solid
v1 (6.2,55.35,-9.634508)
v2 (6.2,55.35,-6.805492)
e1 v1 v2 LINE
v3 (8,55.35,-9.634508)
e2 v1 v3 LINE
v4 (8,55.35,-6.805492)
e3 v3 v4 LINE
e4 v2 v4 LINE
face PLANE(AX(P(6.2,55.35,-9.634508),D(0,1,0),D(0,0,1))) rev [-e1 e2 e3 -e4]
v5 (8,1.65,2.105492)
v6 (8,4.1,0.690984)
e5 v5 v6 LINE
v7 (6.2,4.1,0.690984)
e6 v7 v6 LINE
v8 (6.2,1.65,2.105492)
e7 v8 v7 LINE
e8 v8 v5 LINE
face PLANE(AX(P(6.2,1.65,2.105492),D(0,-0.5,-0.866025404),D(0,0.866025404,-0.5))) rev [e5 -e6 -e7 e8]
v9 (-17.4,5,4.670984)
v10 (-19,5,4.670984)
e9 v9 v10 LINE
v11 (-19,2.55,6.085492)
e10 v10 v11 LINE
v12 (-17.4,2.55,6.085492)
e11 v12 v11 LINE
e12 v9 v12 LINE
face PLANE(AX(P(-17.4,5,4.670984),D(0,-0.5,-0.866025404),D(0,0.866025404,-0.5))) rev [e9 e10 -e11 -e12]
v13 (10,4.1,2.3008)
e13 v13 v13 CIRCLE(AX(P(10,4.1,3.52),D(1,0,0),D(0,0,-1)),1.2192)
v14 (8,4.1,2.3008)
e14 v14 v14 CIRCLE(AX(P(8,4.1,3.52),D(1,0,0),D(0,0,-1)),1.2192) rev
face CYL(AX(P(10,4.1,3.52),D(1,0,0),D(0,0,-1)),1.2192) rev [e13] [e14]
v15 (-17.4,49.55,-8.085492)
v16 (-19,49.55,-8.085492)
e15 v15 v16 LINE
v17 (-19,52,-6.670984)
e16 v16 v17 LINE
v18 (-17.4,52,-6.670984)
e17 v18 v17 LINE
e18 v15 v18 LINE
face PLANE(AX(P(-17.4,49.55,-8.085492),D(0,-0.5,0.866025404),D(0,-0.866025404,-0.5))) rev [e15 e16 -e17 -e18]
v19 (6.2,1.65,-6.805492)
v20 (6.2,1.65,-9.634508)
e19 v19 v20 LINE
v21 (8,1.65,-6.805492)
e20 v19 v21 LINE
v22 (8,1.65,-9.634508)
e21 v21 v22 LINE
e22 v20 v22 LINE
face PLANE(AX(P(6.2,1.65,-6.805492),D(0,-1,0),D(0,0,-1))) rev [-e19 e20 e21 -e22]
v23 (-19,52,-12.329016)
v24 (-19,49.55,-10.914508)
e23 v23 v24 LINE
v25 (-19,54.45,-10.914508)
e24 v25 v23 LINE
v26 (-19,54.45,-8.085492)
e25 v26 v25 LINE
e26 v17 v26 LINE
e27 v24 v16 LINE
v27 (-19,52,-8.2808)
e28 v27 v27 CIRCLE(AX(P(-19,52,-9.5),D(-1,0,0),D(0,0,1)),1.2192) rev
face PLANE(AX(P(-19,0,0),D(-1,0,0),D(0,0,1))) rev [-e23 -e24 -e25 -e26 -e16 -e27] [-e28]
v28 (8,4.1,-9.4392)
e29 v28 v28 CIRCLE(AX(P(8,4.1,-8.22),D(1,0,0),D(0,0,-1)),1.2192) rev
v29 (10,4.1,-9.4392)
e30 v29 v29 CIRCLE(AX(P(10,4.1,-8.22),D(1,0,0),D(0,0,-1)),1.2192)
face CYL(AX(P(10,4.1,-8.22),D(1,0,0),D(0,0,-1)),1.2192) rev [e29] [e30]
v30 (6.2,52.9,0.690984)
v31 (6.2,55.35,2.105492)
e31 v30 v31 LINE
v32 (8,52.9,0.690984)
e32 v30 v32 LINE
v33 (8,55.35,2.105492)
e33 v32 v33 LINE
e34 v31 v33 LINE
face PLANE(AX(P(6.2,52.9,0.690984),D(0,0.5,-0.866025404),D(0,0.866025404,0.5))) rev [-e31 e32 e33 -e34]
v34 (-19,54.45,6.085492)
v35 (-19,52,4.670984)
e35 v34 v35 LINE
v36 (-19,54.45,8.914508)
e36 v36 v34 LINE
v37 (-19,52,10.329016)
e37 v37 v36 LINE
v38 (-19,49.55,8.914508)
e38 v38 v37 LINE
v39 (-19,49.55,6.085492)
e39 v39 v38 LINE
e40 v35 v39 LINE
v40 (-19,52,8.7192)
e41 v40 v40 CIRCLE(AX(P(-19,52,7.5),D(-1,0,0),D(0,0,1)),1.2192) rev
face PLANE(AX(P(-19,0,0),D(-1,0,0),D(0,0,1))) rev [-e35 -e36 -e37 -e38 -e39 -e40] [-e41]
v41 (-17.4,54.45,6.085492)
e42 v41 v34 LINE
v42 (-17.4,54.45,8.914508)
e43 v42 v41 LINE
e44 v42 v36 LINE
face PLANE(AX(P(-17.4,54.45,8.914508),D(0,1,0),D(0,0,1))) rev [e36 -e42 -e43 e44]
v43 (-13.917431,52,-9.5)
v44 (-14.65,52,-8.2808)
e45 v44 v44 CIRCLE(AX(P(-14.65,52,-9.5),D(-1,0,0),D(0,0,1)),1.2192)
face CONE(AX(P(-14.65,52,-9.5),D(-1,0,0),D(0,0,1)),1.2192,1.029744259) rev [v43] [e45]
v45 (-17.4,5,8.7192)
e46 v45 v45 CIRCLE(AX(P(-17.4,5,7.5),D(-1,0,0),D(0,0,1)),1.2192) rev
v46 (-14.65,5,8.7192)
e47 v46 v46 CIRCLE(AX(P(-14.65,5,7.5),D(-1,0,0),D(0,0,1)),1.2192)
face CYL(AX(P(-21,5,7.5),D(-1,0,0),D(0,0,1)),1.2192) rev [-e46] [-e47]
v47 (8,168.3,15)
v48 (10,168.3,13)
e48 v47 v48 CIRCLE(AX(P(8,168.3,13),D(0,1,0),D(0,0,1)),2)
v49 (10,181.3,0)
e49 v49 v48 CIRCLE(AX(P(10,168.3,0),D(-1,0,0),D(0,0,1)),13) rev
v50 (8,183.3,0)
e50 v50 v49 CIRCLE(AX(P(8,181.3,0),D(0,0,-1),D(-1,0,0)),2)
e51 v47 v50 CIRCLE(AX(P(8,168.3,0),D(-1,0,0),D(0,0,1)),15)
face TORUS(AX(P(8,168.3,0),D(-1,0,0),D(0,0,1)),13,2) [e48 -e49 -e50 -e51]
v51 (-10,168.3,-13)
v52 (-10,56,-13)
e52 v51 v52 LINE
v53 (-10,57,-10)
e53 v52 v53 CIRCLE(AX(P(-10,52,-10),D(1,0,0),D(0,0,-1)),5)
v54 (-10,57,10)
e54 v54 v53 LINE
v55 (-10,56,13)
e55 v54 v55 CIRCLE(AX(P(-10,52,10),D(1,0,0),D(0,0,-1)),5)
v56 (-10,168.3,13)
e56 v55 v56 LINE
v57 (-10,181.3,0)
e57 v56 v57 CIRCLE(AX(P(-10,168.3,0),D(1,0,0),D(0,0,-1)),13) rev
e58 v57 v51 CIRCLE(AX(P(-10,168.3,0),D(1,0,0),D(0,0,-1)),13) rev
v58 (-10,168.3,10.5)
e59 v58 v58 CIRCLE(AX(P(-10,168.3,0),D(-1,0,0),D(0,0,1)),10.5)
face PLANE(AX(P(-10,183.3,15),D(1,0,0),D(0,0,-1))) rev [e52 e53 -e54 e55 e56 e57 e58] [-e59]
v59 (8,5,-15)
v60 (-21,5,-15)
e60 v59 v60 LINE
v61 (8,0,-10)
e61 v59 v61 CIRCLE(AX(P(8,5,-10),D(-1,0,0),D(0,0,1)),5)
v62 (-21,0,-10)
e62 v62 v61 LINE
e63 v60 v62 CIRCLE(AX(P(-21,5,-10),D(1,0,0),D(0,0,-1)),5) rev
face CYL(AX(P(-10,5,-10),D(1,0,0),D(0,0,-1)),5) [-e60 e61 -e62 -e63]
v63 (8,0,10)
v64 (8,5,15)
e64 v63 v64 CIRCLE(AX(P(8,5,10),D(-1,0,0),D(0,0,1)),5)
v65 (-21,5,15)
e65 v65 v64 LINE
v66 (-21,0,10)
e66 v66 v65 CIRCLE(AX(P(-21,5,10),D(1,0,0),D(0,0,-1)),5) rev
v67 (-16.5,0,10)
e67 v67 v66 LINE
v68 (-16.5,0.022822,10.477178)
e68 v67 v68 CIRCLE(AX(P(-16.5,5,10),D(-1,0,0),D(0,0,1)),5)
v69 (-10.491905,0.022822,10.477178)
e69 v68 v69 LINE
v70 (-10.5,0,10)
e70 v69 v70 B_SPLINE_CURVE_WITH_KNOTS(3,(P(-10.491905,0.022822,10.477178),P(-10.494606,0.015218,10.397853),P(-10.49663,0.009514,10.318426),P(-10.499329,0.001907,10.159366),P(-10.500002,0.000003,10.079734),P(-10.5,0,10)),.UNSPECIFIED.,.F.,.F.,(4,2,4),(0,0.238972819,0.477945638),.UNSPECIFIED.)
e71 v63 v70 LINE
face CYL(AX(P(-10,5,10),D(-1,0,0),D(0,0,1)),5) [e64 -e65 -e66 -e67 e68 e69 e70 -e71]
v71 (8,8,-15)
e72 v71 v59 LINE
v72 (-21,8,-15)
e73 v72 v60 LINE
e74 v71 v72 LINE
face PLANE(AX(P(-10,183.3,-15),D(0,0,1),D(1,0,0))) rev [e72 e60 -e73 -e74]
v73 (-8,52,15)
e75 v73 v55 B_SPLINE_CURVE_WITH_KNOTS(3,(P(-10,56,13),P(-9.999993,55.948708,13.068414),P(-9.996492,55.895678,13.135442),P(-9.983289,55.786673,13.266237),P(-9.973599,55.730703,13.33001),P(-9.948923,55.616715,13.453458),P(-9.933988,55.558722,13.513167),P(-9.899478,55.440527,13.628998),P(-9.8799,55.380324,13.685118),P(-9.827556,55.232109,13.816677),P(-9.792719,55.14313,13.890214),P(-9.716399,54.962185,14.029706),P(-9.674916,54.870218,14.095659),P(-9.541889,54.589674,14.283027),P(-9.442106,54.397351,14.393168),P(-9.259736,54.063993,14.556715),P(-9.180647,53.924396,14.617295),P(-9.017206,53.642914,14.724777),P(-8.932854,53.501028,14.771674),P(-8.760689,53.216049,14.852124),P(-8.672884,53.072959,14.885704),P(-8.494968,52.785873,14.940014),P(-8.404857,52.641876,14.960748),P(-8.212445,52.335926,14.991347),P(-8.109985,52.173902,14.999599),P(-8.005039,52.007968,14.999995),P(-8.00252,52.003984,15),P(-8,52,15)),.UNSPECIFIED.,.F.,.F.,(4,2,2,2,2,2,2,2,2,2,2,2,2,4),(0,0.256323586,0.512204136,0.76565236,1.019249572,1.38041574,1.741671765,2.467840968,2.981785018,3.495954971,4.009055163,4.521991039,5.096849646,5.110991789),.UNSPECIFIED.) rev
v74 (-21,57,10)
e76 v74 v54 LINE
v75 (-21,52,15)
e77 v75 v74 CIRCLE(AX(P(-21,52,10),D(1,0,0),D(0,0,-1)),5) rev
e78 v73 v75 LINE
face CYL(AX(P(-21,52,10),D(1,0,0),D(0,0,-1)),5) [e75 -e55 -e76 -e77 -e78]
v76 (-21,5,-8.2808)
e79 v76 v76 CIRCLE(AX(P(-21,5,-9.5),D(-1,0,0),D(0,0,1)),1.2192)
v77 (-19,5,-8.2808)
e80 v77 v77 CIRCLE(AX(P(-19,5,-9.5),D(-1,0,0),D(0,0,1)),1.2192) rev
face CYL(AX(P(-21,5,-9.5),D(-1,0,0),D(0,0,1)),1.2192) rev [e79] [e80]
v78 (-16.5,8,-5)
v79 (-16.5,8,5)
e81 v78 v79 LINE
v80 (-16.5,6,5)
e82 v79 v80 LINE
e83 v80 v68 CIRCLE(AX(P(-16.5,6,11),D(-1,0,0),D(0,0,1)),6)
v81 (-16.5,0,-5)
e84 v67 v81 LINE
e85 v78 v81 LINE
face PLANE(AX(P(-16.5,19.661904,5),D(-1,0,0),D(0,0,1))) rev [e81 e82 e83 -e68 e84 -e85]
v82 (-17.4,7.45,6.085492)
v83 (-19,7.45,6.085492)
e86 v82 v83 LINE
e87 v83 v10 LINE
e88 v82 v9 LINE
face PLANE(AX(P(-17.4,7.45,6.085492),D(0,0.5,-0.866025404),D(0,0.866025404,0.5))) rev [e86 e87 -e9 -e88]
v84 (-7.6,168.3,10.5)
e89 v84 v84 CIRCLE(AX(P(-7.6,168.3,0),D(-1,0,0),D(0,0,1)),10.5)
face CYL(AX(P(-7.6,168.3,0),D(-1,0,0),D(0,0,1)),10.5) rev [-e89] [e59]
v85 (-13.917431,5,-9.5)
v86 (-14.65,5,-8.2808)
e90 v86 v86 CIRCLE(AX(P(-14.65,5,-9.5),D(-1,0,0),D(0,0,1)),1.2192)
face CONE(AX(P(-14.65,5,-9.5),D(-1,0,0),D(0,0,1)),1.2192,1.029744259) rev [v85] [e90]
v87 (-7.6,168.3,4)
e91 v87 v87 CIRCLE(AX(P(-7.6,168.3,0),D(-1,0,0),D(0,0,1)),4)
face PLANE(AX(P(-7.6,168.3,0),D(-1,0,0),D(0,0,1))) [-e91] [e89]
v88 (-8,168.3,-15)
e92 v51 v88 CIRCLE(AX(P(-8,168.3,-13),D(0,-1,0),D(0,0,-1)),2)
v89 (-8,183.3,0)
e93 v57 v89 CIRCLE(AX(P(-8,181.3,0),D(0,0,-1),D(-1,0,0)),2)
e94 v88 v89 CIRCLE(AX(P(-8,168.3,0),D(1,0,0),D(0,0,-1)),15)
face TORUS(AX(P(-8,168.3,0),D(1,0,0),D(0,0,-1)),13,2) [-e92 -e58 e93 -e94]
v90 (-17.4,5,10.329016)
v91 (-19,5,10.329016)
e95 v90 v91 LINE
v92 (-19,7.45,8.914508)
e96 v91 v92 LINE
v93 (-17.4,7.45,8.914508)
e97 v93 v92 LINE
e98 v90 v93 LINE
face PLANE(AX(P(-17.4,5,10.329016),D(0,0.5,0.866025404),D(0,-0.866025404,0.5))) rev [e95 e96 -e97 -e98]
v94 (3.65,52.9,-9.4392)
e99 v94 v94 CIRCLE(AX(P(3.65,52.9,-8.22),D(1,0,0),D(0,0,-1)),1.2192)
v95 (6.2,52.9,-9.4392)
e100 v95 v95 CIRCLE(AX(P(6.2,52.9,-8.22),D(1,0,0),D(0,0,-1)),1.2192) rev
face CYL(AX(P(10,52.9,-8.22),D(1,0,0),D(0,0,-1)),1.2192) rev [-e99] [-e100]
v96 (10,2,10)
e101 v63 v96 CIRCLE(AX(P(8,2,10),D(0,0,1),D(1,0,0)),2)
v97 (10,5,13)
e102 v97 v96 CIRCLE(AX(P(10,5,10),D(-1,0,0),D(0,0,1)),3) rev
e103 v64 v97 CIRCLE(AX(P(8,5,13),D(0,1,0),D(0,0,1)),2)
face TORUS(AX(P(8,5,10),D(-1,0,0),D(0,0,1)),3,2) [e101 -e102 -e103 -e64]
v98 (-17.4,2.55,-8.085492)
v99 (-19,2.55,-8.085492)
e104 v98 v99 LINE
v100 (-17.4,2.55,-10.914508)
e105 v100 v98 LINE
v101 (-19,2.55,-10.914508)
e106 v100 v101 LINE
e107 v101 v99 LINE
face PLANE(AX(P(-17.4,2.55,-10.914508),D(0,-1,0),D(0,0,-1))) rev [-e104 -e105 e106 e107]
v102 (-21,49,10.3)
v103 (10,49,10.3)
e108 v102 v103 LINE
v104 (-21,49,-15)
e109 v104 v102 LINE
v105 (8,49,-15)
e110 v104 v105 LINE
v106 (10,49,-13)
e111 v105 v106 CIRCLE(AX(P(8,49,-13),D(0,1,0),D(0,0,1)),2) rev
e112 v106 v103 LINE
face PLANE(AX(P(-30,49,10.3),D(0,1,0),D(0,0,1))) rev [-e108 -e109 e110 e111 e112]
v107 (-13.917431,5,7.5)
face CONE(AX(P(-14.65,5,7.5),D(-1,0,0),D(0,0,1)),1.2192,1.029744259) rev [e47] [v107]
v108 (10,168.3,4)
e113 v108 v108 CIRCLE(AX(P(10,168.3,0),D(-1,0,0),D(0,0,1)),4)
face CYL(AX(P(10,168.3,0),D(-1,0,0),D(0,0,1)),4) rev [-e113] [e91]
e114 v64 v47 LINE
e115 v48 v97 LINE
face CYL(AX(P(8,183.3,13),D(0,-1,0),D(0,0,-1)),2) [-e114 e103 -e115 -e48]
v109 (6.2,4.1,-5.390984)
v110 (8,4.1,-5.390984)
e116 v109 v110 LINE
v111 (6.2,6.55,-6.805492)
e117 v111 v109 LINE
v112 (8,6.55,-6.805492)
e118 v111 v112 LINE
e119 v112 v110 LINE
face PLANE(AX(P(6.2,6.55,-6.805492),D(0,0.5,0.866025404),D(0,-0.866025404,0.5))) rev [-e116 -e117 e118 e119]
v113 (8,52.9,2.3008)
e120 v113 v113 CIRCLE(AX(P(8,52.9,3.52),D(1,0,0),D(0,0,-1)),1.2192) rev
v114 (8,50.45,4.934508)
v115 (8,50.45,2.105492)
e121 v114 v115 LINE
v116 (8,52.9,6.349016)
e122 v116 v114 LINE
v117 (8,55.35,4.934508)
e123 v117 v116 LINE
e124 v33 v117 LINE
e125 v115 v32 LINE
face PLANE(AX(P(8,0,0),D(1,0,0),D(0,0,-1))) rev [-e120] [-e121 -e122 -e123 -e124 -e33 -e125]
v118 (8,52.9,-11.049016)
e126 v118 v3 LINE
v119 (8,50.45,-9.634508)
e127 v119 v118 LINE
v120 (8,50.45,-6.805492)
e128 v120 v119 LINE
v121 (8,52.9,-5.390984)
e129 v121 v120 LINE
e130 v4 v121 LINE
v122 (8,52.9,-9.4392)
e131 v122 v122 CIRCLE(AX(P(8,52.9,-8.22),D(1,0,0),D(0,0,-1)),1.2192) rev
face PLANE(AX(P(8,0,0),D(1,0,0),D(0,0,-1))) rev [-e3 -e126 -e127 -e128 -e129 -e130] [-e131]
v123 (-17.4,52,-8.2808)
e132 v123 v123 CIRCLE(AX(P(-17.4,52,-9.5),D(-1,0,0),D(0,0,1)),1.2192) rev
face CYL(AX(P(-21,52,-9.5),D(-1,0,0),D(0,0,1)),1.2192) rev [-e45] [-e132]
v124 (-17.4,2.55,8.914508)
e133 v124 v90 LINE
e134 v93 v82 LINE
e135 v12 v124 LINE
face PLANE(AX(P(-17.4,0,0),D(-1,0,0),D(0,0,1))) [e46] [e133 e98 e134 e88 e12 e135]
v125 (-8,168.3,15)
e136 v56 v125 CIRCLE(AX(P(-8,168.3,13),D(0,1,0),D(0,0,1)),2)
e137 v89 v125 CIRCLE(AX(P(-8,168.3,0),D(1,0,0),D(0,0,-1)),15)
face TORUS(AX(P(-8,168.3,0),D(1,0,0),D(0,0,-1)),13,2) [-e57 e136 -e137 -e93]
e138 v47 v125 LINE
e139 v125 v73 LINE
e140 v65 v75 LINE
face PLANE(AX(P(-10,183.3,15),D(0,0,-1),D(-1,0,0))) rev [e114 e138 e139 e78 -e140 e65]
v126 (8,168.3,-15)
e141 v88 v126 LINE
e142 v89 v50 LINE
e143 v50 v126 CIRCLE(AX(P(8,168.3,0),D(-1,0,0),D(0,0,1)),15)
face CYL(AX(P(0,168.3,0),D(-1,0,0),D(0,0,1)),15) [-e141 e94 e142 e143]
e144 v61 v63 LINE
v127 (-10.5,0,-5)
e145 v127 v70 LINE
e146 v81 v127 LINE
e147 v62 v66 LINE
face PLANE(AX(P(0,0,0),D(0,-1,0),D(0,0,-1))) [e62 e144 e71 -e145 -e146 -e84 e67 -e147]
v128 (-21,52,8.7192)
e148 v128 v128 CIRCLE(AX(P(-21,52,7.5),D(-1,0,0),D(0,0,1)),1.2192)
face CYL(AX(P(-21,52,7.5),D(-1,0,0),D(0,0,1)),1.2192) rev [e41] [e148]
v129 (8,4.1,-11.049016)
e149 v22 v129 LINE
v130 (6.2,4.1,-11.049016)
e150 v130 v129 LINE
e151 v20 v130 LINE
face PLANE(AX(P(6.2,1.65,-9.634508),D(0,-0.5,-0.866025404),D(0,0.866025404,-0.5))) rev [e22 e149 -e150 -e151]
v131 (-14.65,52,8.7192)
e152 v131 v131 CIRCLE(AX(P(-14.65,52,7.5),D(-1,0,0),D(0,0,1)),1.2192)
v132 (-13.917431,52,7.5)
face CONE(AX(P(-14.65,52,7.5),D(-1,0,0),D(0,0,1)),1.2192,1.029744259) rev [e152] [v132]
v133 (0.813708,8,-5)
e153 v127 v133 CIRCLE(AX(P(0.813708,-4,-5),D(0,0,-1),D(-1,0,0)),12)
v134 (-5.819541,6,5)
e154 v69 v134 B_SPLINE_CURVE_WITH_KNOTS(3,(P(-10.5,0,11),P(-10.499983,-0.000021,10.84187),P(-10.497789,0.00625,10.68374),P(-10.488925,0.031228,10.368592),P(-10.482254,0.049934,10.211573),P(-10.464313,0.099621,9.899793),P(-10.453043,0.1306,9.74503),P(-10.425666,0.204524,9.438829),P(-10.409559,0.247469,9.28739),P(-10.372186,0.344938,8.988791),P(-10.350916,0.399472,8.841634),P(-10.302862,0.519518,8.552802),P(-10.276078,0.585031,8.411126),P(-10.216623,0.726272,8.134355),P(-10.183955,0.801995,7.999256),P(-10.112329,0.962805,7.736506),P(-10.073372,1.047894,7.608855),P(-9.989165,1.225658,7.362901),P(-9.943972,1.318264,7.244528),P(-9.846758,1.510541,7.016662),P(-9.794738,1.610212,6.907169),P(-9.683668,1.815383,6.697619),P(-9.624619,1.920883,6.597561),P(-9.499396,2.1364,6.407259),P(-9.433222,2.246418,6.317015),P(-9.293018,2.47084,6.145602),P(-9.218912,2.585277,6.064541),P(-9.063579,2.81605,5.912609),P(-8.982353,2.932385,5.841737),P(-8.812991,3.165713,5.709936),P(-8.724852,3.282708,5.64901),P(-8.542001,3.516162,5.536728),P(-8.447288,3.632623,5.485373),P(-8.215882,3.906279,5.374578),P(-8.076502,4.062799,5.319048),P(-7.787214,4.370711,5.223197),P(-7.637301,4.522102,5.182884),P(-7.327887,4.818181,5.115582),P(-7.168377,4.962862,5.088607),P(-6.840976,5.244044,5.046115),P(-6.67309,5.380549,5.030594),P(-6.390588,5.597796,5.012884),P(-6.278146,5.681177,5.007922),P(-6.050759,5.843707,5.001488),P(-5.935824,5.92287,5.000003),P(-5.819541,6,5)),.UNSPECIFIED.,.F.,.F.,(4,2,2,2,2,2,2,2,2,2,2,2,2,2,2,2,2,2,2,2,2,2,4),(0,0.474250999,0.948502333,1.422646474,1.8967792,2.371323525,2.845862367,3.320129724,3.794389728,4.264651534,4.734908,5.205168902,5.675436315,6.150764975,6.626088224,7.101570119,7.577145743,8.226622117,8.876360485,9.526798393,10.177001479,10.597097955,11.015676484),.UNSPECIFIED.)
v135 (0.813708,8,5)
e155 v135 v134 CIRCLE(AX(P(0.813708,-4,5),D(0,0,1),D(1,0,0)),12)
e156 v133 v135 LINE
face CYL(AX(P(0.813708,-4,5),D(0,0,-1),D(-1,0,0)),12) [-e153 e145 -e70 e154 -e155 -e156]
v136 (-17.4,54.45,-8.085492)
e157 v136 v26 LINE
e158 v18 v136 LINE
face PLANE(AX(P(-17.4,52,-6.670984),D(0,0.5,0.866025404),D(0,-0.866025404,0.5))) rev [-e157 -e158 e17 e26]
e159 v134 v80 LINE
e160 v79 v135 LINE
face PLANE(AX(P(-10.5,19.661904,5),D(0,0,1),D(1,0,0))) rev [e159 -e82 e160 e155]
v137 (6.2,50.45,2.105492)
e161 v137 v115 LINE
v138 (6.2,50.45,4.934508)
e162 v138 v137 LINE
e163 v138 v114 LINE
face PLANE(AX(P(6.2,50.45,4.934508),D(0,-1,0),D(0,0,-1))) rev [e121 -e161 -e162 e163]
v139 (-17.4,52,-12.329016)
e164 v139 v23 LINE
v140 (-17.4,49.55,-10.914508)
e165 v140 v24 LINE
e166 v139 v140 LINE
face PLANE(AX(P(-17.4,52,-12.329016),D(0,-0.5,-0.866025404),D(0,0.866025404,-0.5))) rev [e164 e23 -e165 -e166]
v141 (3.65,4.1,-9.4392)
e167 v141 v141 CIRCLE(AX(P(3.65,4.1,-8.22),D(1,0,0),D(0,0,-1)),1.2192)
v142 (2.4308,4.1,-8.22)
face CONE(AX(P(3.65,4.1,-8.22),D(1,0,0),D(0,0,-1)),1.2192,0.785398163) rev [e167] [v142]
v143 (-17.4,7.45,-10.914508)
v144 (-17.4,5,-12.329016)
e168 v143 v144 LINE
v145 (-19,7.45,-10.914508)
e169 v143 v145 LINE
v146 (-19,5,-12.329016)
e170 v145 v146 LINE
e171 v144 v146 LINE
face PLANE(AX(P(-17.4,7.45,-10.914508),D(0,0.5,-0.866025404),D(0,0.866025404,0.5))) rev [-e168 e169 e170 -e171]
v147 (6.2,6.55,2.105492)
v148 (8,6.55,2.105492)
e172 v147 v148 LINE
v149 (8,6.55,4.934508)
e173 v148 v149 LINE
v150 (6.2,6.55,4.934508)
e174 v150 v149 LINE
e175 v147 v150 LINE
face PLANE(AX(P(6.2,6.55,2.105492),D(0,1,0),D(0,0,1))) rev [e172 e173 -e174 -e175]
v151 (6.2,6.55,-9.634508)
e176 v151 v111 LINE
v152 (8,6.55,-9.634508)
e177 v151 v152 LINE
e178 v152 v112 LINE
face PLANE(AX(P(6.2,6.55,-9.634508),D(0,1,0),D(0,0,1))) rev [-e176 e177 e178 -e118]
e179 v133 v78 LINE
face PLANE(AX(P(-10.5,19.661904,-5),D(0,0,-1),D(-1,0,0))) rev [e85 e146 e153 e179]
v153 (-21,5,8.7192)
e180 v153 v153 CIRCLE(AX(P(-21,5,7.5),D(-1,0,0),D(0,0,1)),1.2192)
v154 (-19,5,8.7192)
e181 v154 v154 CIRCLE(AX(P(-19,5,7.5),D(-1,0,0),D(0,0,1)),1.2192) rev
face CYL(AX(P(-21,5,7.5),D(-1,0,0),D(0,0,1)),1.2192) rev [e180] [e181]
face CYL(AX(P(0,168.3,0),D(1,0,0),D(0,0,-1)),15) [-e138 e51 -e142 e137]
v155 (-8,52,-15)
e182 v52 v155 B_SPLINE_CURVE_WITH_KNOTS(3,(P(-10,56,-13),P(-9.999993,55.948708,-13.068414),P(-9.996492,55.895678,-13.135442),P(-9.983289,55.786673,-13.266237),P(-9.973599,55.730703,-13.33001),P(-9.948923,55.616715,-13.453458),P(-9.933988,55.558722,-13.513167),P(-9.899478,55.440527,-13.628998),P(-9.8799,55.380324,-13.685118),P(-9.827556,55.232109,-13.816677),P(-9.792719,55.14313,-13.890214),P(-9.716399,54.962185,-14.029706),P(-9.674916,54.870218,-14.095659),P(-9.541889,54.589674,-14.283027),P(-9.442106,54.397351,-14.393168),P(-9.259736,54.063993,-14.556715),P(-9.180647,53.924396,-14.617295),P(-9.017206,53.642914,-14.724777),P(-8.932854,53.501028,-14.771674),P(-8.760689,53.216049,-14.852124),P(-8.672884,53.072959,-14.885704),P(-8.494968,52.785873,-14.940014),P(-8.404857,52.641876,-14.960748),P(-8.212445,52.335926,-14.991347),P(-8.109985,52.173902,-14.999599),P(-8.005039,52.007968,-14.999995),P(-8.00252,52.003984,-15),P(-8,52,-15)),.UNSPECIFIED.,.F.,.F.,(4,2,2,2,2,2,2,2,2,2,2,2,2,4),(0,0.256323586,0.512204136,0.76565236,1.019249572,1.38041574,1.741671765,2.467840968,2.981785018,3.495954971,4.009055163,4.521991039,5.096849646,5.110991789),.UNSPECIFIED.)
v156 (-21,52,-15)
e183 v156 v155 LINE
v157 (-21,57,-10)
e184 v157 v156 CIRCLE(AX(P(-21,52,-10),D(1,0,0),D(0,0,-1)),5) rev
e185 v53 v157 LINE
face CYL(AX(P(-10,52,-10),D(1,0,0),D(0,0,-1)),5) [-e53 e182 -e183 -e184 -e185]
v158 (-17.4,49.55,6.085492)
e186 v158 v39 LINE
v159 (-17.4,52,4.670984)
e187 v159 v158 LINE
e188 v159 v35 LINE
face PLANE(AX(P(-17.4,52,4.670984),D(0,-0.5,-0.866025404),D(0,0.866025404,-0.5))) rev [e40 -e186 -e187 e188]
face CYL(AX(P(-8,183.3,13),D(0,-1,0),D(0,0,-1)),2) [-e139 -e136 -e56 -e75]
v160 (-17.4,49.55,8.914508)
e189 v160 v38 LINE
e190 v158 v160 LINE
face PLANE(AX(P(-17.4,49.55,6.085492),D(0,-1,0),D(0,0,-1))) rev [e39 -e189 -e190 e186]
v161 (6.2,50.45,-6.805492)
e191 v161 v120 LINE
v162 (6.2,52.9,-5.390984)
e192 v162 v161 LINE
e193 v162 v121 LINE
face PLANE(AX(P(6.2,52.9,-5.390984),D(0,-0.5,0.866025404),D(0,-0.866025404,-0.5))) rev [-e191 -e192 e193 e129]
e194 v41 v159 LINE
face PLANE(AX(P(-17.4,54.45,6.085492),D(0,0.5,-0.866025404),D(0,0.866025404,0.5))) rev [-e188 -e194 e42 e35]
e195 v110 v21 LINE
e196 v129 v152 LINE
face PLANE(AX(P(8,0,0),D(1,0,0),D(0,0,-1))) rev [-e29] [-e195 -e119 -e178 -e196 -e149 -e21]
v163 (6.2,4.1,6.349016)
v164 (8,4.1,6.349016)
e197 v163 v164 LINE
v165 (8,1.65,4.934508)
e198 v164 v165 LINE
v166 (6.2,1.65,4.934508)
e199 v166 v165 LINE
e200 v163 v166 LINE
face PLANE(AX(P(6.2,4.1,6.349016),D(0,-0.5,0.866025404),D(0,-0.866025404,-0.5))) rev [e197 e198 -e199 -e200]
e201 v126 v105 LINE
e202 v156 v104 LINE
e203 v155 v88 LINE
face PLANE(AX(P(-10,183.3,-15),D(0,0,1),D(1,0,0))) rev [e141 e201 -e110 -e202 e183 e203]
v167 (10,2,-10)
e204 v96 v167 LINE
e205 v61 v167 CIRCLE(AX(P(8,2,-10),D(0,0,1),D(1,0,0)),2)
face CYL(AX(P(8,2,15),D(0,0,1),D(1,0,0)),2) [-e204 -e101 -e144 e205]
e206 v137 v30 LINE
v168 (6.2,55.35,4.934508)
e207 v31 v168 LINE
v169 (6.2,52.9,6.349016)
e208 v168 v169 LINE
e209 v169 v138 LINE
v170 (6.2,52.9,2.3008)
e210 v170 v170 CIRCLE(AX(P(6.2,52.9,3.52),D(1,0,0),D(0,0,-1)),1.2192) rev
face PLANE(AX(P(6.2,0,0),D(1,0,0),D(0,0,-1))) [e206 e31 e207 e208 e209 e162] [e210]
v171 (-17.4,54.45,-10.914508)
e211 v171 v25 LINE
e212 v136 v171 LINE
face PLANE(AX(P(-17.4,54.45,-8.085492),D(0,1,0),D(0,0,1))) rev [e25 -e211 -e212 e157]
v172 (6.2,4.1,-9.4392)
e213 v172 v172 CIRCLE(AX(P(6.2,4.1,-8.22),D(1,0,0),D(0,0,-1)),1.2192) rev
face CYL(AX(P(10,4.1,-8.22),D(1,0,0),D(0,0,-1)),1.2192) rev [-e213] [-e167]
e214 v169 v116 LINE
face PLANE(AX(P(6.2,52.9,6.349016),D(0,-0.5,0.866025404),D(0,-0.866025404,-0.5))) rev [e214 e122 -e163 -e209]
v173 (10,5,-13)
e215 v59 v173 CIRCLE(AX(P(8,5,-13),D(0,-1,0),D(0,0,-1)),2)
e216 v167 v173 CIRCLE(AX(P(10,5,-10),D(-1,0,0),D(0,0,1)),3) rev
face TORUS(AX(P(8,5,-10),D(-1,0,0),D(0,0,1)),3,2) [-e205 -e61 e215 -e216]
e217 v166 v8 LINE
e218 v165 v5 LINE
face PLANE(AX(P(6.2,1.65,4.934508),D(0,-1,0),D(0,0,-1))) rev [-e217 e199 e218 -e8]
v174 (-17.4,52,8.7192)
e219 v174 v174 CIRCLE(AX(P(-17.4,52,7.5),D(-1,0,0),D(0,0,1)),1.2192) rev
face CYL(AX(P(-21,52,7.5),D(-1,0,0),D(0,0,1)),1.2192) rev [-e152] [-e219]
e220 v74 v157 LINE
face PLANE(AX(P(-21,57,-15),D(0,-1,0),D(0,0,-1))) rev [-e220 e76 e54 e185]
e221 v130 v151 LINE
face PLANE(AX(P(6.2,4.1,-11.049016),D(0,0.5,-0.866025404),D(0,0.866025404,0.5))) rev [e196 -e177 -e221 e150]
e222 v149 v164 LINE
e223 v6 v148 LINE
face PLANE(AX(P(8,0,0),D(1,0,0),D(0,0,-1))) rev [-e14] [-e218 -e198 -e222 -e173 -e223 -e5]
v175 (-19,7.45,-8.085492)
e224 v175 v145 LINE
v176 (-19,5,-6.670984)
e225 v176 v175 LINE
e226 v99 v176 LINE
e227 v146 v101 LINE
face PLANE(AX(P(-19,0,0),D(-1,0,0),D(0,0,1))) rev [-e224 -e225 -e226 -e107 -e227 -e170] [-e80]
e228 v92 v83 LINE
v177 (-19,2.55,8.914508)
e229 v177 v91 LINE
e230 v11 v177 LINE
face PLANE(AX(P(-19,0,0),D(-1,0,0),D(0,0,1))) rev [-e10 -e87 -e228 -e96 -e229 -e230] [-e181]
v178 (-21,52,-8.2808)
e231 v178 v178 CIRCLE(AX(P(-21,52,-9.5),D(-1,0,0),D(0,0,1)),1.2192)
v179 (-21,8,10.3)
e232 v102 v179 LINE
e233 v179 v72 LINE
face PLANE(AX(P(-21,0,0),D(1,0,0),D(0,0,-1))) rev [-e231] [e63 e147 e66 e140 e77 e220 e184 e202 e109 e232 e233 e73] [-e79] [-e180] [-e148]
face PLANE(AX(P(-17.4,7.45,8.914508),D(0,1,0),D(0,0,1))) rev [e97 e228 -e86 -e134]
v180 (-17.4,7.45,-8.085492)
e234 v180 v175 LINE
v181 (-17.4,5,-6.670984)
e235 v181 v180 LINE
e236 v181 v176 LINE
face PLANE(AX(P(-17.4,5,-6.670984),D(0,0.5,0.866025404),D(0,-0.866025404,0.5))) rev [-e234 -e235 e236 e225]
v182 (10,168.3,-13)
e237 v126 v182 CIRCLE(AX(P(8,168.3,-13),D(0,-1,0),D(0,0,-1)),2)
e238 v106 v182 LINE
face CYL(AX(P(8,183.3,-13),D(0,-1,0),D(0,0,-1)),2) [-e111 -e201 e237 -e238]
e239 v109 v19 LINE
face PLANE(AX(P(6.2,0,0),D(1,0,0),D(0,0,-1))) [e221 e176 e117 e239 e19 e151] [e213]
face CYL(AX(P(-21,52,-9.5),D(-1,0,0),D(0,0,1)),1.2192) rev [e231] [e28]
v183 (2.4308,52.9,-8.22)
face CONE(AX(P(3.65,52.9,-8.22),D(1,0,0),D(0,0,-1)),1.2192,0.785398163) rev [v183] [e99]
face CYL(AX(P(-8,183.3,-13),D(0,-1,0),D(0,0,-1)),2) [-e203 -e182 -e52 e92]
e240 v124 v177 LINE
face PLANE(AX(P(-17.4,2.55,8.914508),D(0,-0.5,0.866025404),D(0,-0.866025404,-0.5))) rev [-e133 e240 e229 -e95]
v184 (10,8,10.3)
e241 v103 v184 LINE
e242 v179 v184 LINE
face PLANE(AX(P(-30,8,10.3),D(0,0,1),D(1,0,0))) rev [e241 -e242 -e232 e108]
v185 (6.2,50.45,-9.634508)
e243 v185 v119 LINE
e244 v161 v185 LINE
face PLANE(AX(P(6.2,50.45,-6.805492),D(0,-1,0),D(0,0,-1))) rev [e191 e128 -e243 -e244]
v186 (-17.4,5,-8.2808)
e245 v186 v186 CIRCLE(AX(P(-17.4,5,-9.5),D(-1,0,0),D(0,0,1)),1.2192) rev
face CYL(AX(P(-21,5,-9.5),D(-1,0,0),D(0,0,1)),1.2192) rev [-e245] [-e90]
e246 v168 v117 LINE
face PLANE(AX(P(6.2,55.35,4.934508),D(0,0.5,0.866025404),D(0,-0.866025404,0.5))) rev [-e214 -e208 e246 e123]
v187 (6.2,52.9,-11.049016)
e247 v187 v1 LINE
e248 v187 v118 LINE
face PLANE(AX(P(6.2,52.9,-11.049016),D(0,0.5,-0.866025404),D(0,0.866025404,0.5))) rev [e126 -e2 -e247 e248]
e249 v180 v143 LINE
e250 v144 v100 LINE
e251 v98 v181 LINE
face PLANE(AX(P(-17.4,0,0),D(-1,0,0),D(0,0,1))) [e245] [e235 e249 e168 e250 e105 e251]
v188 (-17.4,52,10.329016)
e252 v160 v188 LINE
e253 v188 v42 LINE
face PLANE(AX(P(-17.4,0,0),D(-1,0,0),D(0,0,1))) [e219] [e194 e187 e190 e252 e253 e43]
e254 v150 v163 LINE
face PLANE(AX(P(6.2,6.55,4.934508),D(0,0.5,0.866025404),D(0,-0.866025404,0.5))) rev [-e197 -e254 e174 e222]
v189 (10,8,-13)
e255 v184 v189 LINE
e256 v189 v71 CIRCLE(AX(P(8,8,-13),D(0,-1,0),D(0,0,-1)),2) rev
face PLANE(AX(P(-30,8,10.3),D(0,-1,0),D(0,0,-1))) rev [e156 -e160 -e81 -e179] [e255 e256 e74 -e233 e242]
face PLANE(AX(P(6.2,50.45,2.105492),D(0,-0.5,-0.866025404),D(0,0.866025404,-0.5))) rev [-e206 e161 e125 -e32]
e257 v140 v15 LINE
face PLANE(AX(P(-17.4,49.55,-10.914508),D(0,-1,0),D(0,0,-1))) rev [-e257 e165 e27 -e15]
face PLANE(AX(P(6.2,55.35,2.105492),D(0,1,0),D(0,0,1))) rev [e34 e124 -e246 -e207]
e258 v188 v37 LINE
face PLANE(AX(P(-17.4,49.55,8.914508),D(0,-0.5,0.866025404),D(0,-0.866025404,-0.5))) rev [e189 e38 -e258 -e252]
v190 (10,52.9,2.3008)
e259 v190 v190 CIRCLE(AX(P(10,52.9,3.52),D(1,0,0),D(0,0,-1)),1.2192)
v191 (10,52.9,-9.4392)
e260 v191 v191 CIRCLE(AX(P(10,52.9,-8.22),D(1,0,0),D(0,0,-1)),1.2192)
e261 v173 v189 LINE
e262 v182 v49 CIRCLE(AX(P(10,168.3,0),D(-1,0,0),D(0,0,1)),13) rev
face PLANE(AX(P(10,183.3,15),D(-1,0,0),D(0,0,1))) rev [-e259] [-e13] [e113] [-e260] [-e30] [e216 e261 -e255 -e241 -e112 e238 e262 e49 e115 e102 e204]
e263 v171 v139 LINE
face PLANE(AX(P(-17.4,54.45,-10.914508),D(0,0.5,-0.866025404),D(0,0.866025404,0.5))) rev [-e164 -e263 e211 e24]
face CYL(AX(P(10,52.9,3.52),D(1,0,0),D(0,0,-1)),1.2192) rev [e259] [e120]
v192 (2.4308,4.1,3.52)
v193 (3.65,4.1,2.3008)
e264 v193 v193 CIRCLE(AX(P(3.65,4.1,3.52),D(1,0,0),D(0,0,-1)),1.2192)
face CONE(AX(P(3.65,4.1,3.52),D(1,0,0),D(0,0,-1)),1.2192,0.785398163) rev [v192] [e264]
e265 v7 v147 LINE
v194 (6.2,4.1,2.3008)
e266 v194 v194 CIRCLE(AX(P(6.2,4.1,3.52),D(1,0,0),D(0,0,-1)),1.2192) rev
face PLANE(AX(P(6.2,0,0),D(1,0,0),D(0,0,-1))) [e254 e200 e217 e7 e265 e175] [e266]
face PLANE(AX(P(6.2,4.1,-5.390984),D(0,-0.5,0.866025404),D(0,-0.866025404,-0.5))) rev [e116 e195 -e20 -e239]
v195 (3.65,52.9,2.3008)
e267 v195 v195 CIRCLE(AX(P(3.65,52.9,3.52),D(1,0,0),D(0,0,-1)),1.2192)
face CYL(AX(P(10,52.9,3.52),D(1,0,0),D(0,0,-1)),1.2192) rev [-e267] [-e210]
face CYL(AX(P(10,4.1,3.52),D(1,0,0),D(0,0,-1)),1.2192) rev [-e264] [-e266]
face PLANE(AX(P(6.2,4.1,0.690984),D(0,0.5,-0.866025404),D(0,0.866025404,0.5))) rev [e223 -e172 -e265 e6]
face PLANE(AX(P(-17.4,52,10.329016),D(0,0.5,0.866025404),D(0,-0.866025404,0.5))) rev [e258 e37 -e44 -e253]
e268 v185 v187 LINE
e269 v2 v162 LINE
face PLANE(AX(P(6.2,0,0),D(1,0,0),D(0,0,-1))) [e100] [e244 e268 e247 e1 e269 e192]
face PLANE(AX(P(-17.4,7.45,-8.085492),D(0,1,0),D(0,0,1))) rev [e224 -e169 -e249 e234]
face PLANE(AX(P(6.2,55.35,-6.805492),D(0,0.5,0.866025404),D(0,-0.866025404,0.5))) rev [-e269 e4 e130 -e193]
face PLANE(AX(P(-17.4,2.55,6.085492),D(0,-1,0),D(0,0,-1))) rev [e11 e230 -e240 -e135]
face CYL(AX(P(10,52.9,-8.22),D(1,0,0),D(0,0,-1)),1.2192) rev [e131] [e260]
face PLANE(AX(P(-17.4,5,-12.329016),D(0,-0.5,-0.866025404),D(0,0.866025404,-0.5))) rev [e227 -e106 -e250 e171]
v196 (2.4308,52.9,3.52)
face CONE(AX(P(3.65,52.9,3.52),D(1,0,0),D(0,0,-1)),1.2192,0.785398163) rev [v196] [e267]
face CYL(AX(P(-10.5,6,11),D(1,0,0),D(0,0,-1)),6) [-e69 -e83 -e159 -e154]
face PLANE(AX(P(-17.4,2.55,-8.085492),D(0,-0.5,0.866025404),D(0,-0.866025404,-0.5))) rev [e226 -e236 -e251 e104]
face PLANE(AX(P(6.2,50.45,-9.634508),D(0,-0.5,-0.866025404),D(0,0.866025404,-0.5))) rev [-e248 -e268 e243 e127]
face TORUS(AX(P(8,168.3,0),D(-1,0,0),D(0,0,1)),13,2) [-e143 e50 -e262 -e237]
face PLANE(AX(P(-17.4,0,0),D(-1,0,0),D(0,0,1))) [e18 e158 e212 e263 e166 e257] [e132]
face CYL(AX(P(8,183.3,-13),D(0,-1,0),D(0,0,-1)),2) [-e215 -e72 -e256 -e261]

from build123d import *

# Parameters (mm, degrees)
SKETCH1_W                 = 20
SKETCH1_H                 = 30
BOSS_EXTRUDE1_DEPTH       = 183.3
SKETCH13_W                = 30
SKETCH13_H                = 57
BOSS_EXTRUDE2_DEPTH       = 11
SKETCH3_W                 = 20.6
SKETCH3_H                 = 41
CUT_EXTRUDE1_DEPTH        = 40
SKETCH11_R                = 10.5
CUT_EXTRUDE4_DEPTH        = 2.4
SKETCH12_R                = 4
CUT_EXTRUDE5_DEPTH        = 185.752943143
SKETCH14_W                = 31
SKETCH14_H                = 41
CUT_EXTRUDE6_DEPTH        = 25.3
F_2_CLEARANCE_HOLE2_D     = 2.4384
F_2_CLEARANCE_HOLE2_DEPTH = 6.35
F_2_CLEARANCE_HOLE2_TIP   = 0.732569267
CUT_EXTRUDE8_START        = -2
CUT_EXTRUDE8_DEPTH        = 1.6
F_2_CLEARANCE_HOLE3_D     = 2.4384
F_2_CLEARANCE_HOLE3_DEPTH = 6.35
F_2_CLEARANCE_HOLE3_TIP   = 1.2192
FILLET3_R                 = 15
FILLET4_R                 = 5
FILLET5_R                 = 2
SKETCH21_W                = 6
SKETCH21_H                = 10
CUT_EXTRUDE9_DEPTH        = 8
FILLET6_R                 = 12
FILLET7_R                 = 6
CUT_EXTRUDE10_START       = -2
CUT_EXTRUDE10_DEPTH       = 1.8


# Some blends are built 0.0001 mm under size
with BuildPart() as part:
    # Sketch1 → Boss-Extrude1 (new body)
    with BuildSketch(Plane(origin=(0, 0, 0), x_dir=(1, 0, 0), z_dir=(0, 1, 0))):
        Rectangle(SKETCH1_W, SKETCH1_H)
    extrude(amount=BOSS_EXTRUDE1_DEPTH)

    # Sketch13 → Boss-Extrude2 (add)
    with BuildSketch(Plane.ZY.offset(10)):
        with Locations((0, 28.5)):
            Rectangle(SKETCH13_W, SKETCH13_H)
    extrude(amount=BOSS_EXTRUDE2_DEPTH)

    # Sketch3 → Cut-Extrude1 (cut)
    with BuildSketch(Plane(origin=(10, 0, 0), x_dir=(0, 0, -1), z_dir=(1, 0, 0))):
        with Locations((0, 28.5)):
            Rectangle(SKETCH3_W, SKETCH3_H)
    extrude(amount=-CUT_EXTRUDE1_DEPTH, mode=Mode.SUBTRACT)

    # Sketch11 → Cut-Extrude4 (cut)
    with BuildSketch(Plane.ZY.offset(10)):
        with Locations((0, 168.3)):
            Circle(SKETCH11_R)
    extrude(amount=-CUT_EXTRUDE4_DEPTH, mode=Mode.SUBTRACT)

    # Sketch12 → Cut-Extrude5 (cut, through all)
    with BuildSketch(Plane.ZY.offset(7.6)):
        with Locations((0, 168.3)):
            Circle(SKETCH12_R)
    extrude(amount=-CUT_EXTRUDE5_DEPTH, mode=Mode.SUBTRACT)

    # Sketch14 → Cut-Extrude6 (cut)
    with BuildSketch(Plane(origin=(0, 0, -15), x_dir=(-1, 0, 0), z_dir=(0, 0, -1))):
        with Locations((5.5, 28.5)):
            Rectangle(SKETCH14_W, SKETCH14_H)
    extrude(amount=-CUT_EXTRUDE6_DEPTH, mode=Mode.SUBTRACT)

    # #2 Clearance Hole2
    with Locations(Plane.ZY.offset(21)):
        with Locations((-9.5, 5), (7.5, 5), (-9.5, 52), (7.5, 52)):
            Hole(F_2_CLEARANCE_HOLE2_D / 2, depth=F_2_CLEARANCE_HOLE2_DEPTH)
            with Locations((0, 0, -(F_2_CLEARANCE_HOLE2_DEPTH + F_2_CLEARANCE_HOLE2_TIP / 2))):  # 118° drill point
                Cone(0, F_2_CLEARANCE_HOLE2_D / 2, F_2_CLEARANCE_HOLE2_TIP, mode=Mode.SUBTRACT)

    # Sketch18 → Cut-Extrude8 (cut)
    with BuildSketch(Plane.ZY.offset(21).offset(CUT_EXTRUDE8_START)):
        Polygon((-12.329016319, 5), (-10.91450816, 2.55), (-8.08549184, 2.55), (-6.670983681, 5), (-8.08549184, 7.45), (-10.91450816, 7.45), align=None)
        Polygon((10.329016319, 5), (8.91450816, 7.45), (6.08549184, 7.45), (4.670983681, 5), (6.08549184, 2.55), (8.91450816, 2.55), align=None)
        Polygon((4.670983681, 52), (6.08549184, 49.55), (8.91450816, 49.55), (10.329016319, 52), (8.91450816, 54.45), (6.08549184, 54.45), align=None)
        Polygon((-6.670983681, 52), (-8.08549184, 54.45), (-10.91450816, 54.45), (-12.329016319, 52), (-10.91450816, 49.55), (-8.08549184, 49.55), align=None)
    extrude(amount=-CUT_EXTRUDE8_DEPTH, mode=Mode.SUBTRACT)

    # #2 Clearance Hole3
    with Locations(Plane(origin=(10, 0, 0), x_dir=(0, 0, -1), z_dir=(1, 0, 0))):
        with Locations((8.22, 4.1), (-3.52, 4.1), (-3.52, 52.9), (8.22, 52.9)):
            Hole(F_2_CLEARANCE_HOLE3_D / 2, depth=F_2_CLEARANCE_HOLE3_DEPTH)
            with Locations((0, 0, -(F_2_CLEARANCE_HOLE3_DEPTH + F_2_CLEARANCE_HOLE3_TIP / 2))):  # 90° drill point
                Cone(0, F_2_CLEARANCE_HOLE3_D / 2, F_2_CLEARANCE_HOLE3_TIP, mode=Mode.SUBTRACT)

    # Fillet3
    fillet3_edges = [part.edges().sort_by_distance(p)[0] for p in [
        (0, 183.3, -15),
        (0, 183.3, 15),
    ]]
    fillet(fillet3_edges, radius=FILLET3_R - 0.0001)  # a hair under: the kernel refuses the full size

    # Fillet4
    fillet4_edges = [part.edges().sort_by_distance(p)[0] for p in [
        (-15.5, 57, -15),
        (-15.5, 57, 15),
        (-5.5, 0, -15),
        (-5.5, 0, 15),
    ]]
    fillet(fillet4_edges, radius=FILLET4_R)

    # Fillet5
    fillet5_edges = [part.edges().sort_by_distance(p)[0] for p in [
        (-10, 110.15005, 15),
        (-10, 110.15005, -15),
        (-10, 178.906631007, 10.606631007),
        (-10, 178.906631007, -10.606631007),
        (10, 108.65005, -15),
        (10, 86.65005, 15),
        (10, 178.906631007, 10.606631007),
        (10, 178.906631007, -10.606631007),
        (10, 0, 0),
        (10, 1.464466094, 13.535533906),
        (10, 1.464466094, -13.535533906),
        (10, 6.5, -15),
    ]]
    fillet(fillet5_edges, radius=FILLET5_R)

    # Sketch21 → Cut-Extrude9 (cut)
    with BuildSketch(Plane.XZ):
        with Locations((-13.5, 0)):
            Rectangle(SKETCH21_W, SKETCH21_H)
    extrude(amount=-CUT_EXTRUDE9_DEPTH, mode=Mode.SUBTRACT)

    # Fillet6
    # the kernel refuses this fillet: 12 mm, written as the material it takes off along each edge
    with BuildSketch(Plane(origin=(-10.5, 8, -5), x_dir=(1, 0, 0), z_dir=(0, 0, 1))) as fillet6_piece_1:
        with BuildLine():
            CenterArc((11.313708499, -12), FILLET6_R, 90, 70.528779366)
            Line((0, -8), (0, 0))
            Line((0, 0), (11.313708499, 0))
        make_face()
    extrude(amount=10, mode=Mode.SUBTRACT)

    # Fillet7
    # the kernel refuses this fillet: 6 mm, written as the material it takes off along each edge
    with BuildSketch(Plane(origin=(4.5, 0, 5), x_dir=(0, 1, 0), z_dir=(-1, 0, 0))) as fillet7_piece_1_section:
        with BuildLine():
            CenterArc((FILLET7_R, -FILLET7_R), FILLET7_R, 90, 90)
            Line((0, -FILLET7_R), (0, 0))
            Line((0, 0), (FILLET7_R, 0))
        make_face()
    fillet7_piece_1 = extrude(amount=21, mode=Mode.PRIVATE)
    fillet7_piece_1 = fillet7_piece_1 - Plane(origin=(0.813708499, -4, 5), x_dir=(1, 0, 0), z_dir=(0, 0, -1)) * Cylinder(12, 66, mode=Mode.PRIVATE)
    add(fillet7_piece_1, mode=Mode.SUBTRACT)

    # Sketch22 → Cut-Extrude10 (cut)
    with BuildSketch(Plane(origin=(10, 0, 0), x_dir=(0, 0, -1), z_dir=(1, 0, 0)).offset(CUT_EXTRUDE10_START)):
        Polygon((-6.349016319, 52.9), (-4.93450816, 50.45), (-2.10549184, 50.45), (-0.690983681, 52.9), (-2.10549184, 55.35), (-4.93450816, 55.35), align=None)
        Polygon((5.390983681, 52.9), (6.80549184, 50.45), (9.63450816, 50.45), (11.049016319, 52.9), (9.63450816, 55.35), (6.80549184, 55.35), align=None)
        Polygon((-6.349016319, 4.1), (-4.93450816, 1.65), (-2.10549184, 1.65), (-0.690983681, 4.1), (-2.10549184, 6.55), (-4.93450816, 6.55), align=None)
        Polygon((5.390983681, 4.1), (6.80549184, 1.65), (9.63450816, 1.65), (11.049016319, 4.1), (9.63450816, 6.55), (6.80549184, 6.55), align=None)
    extrude(amount=-CUT_EXTRUDE10_DEPTH, mode=Mode.SUBTRACT)


solid = part.part
